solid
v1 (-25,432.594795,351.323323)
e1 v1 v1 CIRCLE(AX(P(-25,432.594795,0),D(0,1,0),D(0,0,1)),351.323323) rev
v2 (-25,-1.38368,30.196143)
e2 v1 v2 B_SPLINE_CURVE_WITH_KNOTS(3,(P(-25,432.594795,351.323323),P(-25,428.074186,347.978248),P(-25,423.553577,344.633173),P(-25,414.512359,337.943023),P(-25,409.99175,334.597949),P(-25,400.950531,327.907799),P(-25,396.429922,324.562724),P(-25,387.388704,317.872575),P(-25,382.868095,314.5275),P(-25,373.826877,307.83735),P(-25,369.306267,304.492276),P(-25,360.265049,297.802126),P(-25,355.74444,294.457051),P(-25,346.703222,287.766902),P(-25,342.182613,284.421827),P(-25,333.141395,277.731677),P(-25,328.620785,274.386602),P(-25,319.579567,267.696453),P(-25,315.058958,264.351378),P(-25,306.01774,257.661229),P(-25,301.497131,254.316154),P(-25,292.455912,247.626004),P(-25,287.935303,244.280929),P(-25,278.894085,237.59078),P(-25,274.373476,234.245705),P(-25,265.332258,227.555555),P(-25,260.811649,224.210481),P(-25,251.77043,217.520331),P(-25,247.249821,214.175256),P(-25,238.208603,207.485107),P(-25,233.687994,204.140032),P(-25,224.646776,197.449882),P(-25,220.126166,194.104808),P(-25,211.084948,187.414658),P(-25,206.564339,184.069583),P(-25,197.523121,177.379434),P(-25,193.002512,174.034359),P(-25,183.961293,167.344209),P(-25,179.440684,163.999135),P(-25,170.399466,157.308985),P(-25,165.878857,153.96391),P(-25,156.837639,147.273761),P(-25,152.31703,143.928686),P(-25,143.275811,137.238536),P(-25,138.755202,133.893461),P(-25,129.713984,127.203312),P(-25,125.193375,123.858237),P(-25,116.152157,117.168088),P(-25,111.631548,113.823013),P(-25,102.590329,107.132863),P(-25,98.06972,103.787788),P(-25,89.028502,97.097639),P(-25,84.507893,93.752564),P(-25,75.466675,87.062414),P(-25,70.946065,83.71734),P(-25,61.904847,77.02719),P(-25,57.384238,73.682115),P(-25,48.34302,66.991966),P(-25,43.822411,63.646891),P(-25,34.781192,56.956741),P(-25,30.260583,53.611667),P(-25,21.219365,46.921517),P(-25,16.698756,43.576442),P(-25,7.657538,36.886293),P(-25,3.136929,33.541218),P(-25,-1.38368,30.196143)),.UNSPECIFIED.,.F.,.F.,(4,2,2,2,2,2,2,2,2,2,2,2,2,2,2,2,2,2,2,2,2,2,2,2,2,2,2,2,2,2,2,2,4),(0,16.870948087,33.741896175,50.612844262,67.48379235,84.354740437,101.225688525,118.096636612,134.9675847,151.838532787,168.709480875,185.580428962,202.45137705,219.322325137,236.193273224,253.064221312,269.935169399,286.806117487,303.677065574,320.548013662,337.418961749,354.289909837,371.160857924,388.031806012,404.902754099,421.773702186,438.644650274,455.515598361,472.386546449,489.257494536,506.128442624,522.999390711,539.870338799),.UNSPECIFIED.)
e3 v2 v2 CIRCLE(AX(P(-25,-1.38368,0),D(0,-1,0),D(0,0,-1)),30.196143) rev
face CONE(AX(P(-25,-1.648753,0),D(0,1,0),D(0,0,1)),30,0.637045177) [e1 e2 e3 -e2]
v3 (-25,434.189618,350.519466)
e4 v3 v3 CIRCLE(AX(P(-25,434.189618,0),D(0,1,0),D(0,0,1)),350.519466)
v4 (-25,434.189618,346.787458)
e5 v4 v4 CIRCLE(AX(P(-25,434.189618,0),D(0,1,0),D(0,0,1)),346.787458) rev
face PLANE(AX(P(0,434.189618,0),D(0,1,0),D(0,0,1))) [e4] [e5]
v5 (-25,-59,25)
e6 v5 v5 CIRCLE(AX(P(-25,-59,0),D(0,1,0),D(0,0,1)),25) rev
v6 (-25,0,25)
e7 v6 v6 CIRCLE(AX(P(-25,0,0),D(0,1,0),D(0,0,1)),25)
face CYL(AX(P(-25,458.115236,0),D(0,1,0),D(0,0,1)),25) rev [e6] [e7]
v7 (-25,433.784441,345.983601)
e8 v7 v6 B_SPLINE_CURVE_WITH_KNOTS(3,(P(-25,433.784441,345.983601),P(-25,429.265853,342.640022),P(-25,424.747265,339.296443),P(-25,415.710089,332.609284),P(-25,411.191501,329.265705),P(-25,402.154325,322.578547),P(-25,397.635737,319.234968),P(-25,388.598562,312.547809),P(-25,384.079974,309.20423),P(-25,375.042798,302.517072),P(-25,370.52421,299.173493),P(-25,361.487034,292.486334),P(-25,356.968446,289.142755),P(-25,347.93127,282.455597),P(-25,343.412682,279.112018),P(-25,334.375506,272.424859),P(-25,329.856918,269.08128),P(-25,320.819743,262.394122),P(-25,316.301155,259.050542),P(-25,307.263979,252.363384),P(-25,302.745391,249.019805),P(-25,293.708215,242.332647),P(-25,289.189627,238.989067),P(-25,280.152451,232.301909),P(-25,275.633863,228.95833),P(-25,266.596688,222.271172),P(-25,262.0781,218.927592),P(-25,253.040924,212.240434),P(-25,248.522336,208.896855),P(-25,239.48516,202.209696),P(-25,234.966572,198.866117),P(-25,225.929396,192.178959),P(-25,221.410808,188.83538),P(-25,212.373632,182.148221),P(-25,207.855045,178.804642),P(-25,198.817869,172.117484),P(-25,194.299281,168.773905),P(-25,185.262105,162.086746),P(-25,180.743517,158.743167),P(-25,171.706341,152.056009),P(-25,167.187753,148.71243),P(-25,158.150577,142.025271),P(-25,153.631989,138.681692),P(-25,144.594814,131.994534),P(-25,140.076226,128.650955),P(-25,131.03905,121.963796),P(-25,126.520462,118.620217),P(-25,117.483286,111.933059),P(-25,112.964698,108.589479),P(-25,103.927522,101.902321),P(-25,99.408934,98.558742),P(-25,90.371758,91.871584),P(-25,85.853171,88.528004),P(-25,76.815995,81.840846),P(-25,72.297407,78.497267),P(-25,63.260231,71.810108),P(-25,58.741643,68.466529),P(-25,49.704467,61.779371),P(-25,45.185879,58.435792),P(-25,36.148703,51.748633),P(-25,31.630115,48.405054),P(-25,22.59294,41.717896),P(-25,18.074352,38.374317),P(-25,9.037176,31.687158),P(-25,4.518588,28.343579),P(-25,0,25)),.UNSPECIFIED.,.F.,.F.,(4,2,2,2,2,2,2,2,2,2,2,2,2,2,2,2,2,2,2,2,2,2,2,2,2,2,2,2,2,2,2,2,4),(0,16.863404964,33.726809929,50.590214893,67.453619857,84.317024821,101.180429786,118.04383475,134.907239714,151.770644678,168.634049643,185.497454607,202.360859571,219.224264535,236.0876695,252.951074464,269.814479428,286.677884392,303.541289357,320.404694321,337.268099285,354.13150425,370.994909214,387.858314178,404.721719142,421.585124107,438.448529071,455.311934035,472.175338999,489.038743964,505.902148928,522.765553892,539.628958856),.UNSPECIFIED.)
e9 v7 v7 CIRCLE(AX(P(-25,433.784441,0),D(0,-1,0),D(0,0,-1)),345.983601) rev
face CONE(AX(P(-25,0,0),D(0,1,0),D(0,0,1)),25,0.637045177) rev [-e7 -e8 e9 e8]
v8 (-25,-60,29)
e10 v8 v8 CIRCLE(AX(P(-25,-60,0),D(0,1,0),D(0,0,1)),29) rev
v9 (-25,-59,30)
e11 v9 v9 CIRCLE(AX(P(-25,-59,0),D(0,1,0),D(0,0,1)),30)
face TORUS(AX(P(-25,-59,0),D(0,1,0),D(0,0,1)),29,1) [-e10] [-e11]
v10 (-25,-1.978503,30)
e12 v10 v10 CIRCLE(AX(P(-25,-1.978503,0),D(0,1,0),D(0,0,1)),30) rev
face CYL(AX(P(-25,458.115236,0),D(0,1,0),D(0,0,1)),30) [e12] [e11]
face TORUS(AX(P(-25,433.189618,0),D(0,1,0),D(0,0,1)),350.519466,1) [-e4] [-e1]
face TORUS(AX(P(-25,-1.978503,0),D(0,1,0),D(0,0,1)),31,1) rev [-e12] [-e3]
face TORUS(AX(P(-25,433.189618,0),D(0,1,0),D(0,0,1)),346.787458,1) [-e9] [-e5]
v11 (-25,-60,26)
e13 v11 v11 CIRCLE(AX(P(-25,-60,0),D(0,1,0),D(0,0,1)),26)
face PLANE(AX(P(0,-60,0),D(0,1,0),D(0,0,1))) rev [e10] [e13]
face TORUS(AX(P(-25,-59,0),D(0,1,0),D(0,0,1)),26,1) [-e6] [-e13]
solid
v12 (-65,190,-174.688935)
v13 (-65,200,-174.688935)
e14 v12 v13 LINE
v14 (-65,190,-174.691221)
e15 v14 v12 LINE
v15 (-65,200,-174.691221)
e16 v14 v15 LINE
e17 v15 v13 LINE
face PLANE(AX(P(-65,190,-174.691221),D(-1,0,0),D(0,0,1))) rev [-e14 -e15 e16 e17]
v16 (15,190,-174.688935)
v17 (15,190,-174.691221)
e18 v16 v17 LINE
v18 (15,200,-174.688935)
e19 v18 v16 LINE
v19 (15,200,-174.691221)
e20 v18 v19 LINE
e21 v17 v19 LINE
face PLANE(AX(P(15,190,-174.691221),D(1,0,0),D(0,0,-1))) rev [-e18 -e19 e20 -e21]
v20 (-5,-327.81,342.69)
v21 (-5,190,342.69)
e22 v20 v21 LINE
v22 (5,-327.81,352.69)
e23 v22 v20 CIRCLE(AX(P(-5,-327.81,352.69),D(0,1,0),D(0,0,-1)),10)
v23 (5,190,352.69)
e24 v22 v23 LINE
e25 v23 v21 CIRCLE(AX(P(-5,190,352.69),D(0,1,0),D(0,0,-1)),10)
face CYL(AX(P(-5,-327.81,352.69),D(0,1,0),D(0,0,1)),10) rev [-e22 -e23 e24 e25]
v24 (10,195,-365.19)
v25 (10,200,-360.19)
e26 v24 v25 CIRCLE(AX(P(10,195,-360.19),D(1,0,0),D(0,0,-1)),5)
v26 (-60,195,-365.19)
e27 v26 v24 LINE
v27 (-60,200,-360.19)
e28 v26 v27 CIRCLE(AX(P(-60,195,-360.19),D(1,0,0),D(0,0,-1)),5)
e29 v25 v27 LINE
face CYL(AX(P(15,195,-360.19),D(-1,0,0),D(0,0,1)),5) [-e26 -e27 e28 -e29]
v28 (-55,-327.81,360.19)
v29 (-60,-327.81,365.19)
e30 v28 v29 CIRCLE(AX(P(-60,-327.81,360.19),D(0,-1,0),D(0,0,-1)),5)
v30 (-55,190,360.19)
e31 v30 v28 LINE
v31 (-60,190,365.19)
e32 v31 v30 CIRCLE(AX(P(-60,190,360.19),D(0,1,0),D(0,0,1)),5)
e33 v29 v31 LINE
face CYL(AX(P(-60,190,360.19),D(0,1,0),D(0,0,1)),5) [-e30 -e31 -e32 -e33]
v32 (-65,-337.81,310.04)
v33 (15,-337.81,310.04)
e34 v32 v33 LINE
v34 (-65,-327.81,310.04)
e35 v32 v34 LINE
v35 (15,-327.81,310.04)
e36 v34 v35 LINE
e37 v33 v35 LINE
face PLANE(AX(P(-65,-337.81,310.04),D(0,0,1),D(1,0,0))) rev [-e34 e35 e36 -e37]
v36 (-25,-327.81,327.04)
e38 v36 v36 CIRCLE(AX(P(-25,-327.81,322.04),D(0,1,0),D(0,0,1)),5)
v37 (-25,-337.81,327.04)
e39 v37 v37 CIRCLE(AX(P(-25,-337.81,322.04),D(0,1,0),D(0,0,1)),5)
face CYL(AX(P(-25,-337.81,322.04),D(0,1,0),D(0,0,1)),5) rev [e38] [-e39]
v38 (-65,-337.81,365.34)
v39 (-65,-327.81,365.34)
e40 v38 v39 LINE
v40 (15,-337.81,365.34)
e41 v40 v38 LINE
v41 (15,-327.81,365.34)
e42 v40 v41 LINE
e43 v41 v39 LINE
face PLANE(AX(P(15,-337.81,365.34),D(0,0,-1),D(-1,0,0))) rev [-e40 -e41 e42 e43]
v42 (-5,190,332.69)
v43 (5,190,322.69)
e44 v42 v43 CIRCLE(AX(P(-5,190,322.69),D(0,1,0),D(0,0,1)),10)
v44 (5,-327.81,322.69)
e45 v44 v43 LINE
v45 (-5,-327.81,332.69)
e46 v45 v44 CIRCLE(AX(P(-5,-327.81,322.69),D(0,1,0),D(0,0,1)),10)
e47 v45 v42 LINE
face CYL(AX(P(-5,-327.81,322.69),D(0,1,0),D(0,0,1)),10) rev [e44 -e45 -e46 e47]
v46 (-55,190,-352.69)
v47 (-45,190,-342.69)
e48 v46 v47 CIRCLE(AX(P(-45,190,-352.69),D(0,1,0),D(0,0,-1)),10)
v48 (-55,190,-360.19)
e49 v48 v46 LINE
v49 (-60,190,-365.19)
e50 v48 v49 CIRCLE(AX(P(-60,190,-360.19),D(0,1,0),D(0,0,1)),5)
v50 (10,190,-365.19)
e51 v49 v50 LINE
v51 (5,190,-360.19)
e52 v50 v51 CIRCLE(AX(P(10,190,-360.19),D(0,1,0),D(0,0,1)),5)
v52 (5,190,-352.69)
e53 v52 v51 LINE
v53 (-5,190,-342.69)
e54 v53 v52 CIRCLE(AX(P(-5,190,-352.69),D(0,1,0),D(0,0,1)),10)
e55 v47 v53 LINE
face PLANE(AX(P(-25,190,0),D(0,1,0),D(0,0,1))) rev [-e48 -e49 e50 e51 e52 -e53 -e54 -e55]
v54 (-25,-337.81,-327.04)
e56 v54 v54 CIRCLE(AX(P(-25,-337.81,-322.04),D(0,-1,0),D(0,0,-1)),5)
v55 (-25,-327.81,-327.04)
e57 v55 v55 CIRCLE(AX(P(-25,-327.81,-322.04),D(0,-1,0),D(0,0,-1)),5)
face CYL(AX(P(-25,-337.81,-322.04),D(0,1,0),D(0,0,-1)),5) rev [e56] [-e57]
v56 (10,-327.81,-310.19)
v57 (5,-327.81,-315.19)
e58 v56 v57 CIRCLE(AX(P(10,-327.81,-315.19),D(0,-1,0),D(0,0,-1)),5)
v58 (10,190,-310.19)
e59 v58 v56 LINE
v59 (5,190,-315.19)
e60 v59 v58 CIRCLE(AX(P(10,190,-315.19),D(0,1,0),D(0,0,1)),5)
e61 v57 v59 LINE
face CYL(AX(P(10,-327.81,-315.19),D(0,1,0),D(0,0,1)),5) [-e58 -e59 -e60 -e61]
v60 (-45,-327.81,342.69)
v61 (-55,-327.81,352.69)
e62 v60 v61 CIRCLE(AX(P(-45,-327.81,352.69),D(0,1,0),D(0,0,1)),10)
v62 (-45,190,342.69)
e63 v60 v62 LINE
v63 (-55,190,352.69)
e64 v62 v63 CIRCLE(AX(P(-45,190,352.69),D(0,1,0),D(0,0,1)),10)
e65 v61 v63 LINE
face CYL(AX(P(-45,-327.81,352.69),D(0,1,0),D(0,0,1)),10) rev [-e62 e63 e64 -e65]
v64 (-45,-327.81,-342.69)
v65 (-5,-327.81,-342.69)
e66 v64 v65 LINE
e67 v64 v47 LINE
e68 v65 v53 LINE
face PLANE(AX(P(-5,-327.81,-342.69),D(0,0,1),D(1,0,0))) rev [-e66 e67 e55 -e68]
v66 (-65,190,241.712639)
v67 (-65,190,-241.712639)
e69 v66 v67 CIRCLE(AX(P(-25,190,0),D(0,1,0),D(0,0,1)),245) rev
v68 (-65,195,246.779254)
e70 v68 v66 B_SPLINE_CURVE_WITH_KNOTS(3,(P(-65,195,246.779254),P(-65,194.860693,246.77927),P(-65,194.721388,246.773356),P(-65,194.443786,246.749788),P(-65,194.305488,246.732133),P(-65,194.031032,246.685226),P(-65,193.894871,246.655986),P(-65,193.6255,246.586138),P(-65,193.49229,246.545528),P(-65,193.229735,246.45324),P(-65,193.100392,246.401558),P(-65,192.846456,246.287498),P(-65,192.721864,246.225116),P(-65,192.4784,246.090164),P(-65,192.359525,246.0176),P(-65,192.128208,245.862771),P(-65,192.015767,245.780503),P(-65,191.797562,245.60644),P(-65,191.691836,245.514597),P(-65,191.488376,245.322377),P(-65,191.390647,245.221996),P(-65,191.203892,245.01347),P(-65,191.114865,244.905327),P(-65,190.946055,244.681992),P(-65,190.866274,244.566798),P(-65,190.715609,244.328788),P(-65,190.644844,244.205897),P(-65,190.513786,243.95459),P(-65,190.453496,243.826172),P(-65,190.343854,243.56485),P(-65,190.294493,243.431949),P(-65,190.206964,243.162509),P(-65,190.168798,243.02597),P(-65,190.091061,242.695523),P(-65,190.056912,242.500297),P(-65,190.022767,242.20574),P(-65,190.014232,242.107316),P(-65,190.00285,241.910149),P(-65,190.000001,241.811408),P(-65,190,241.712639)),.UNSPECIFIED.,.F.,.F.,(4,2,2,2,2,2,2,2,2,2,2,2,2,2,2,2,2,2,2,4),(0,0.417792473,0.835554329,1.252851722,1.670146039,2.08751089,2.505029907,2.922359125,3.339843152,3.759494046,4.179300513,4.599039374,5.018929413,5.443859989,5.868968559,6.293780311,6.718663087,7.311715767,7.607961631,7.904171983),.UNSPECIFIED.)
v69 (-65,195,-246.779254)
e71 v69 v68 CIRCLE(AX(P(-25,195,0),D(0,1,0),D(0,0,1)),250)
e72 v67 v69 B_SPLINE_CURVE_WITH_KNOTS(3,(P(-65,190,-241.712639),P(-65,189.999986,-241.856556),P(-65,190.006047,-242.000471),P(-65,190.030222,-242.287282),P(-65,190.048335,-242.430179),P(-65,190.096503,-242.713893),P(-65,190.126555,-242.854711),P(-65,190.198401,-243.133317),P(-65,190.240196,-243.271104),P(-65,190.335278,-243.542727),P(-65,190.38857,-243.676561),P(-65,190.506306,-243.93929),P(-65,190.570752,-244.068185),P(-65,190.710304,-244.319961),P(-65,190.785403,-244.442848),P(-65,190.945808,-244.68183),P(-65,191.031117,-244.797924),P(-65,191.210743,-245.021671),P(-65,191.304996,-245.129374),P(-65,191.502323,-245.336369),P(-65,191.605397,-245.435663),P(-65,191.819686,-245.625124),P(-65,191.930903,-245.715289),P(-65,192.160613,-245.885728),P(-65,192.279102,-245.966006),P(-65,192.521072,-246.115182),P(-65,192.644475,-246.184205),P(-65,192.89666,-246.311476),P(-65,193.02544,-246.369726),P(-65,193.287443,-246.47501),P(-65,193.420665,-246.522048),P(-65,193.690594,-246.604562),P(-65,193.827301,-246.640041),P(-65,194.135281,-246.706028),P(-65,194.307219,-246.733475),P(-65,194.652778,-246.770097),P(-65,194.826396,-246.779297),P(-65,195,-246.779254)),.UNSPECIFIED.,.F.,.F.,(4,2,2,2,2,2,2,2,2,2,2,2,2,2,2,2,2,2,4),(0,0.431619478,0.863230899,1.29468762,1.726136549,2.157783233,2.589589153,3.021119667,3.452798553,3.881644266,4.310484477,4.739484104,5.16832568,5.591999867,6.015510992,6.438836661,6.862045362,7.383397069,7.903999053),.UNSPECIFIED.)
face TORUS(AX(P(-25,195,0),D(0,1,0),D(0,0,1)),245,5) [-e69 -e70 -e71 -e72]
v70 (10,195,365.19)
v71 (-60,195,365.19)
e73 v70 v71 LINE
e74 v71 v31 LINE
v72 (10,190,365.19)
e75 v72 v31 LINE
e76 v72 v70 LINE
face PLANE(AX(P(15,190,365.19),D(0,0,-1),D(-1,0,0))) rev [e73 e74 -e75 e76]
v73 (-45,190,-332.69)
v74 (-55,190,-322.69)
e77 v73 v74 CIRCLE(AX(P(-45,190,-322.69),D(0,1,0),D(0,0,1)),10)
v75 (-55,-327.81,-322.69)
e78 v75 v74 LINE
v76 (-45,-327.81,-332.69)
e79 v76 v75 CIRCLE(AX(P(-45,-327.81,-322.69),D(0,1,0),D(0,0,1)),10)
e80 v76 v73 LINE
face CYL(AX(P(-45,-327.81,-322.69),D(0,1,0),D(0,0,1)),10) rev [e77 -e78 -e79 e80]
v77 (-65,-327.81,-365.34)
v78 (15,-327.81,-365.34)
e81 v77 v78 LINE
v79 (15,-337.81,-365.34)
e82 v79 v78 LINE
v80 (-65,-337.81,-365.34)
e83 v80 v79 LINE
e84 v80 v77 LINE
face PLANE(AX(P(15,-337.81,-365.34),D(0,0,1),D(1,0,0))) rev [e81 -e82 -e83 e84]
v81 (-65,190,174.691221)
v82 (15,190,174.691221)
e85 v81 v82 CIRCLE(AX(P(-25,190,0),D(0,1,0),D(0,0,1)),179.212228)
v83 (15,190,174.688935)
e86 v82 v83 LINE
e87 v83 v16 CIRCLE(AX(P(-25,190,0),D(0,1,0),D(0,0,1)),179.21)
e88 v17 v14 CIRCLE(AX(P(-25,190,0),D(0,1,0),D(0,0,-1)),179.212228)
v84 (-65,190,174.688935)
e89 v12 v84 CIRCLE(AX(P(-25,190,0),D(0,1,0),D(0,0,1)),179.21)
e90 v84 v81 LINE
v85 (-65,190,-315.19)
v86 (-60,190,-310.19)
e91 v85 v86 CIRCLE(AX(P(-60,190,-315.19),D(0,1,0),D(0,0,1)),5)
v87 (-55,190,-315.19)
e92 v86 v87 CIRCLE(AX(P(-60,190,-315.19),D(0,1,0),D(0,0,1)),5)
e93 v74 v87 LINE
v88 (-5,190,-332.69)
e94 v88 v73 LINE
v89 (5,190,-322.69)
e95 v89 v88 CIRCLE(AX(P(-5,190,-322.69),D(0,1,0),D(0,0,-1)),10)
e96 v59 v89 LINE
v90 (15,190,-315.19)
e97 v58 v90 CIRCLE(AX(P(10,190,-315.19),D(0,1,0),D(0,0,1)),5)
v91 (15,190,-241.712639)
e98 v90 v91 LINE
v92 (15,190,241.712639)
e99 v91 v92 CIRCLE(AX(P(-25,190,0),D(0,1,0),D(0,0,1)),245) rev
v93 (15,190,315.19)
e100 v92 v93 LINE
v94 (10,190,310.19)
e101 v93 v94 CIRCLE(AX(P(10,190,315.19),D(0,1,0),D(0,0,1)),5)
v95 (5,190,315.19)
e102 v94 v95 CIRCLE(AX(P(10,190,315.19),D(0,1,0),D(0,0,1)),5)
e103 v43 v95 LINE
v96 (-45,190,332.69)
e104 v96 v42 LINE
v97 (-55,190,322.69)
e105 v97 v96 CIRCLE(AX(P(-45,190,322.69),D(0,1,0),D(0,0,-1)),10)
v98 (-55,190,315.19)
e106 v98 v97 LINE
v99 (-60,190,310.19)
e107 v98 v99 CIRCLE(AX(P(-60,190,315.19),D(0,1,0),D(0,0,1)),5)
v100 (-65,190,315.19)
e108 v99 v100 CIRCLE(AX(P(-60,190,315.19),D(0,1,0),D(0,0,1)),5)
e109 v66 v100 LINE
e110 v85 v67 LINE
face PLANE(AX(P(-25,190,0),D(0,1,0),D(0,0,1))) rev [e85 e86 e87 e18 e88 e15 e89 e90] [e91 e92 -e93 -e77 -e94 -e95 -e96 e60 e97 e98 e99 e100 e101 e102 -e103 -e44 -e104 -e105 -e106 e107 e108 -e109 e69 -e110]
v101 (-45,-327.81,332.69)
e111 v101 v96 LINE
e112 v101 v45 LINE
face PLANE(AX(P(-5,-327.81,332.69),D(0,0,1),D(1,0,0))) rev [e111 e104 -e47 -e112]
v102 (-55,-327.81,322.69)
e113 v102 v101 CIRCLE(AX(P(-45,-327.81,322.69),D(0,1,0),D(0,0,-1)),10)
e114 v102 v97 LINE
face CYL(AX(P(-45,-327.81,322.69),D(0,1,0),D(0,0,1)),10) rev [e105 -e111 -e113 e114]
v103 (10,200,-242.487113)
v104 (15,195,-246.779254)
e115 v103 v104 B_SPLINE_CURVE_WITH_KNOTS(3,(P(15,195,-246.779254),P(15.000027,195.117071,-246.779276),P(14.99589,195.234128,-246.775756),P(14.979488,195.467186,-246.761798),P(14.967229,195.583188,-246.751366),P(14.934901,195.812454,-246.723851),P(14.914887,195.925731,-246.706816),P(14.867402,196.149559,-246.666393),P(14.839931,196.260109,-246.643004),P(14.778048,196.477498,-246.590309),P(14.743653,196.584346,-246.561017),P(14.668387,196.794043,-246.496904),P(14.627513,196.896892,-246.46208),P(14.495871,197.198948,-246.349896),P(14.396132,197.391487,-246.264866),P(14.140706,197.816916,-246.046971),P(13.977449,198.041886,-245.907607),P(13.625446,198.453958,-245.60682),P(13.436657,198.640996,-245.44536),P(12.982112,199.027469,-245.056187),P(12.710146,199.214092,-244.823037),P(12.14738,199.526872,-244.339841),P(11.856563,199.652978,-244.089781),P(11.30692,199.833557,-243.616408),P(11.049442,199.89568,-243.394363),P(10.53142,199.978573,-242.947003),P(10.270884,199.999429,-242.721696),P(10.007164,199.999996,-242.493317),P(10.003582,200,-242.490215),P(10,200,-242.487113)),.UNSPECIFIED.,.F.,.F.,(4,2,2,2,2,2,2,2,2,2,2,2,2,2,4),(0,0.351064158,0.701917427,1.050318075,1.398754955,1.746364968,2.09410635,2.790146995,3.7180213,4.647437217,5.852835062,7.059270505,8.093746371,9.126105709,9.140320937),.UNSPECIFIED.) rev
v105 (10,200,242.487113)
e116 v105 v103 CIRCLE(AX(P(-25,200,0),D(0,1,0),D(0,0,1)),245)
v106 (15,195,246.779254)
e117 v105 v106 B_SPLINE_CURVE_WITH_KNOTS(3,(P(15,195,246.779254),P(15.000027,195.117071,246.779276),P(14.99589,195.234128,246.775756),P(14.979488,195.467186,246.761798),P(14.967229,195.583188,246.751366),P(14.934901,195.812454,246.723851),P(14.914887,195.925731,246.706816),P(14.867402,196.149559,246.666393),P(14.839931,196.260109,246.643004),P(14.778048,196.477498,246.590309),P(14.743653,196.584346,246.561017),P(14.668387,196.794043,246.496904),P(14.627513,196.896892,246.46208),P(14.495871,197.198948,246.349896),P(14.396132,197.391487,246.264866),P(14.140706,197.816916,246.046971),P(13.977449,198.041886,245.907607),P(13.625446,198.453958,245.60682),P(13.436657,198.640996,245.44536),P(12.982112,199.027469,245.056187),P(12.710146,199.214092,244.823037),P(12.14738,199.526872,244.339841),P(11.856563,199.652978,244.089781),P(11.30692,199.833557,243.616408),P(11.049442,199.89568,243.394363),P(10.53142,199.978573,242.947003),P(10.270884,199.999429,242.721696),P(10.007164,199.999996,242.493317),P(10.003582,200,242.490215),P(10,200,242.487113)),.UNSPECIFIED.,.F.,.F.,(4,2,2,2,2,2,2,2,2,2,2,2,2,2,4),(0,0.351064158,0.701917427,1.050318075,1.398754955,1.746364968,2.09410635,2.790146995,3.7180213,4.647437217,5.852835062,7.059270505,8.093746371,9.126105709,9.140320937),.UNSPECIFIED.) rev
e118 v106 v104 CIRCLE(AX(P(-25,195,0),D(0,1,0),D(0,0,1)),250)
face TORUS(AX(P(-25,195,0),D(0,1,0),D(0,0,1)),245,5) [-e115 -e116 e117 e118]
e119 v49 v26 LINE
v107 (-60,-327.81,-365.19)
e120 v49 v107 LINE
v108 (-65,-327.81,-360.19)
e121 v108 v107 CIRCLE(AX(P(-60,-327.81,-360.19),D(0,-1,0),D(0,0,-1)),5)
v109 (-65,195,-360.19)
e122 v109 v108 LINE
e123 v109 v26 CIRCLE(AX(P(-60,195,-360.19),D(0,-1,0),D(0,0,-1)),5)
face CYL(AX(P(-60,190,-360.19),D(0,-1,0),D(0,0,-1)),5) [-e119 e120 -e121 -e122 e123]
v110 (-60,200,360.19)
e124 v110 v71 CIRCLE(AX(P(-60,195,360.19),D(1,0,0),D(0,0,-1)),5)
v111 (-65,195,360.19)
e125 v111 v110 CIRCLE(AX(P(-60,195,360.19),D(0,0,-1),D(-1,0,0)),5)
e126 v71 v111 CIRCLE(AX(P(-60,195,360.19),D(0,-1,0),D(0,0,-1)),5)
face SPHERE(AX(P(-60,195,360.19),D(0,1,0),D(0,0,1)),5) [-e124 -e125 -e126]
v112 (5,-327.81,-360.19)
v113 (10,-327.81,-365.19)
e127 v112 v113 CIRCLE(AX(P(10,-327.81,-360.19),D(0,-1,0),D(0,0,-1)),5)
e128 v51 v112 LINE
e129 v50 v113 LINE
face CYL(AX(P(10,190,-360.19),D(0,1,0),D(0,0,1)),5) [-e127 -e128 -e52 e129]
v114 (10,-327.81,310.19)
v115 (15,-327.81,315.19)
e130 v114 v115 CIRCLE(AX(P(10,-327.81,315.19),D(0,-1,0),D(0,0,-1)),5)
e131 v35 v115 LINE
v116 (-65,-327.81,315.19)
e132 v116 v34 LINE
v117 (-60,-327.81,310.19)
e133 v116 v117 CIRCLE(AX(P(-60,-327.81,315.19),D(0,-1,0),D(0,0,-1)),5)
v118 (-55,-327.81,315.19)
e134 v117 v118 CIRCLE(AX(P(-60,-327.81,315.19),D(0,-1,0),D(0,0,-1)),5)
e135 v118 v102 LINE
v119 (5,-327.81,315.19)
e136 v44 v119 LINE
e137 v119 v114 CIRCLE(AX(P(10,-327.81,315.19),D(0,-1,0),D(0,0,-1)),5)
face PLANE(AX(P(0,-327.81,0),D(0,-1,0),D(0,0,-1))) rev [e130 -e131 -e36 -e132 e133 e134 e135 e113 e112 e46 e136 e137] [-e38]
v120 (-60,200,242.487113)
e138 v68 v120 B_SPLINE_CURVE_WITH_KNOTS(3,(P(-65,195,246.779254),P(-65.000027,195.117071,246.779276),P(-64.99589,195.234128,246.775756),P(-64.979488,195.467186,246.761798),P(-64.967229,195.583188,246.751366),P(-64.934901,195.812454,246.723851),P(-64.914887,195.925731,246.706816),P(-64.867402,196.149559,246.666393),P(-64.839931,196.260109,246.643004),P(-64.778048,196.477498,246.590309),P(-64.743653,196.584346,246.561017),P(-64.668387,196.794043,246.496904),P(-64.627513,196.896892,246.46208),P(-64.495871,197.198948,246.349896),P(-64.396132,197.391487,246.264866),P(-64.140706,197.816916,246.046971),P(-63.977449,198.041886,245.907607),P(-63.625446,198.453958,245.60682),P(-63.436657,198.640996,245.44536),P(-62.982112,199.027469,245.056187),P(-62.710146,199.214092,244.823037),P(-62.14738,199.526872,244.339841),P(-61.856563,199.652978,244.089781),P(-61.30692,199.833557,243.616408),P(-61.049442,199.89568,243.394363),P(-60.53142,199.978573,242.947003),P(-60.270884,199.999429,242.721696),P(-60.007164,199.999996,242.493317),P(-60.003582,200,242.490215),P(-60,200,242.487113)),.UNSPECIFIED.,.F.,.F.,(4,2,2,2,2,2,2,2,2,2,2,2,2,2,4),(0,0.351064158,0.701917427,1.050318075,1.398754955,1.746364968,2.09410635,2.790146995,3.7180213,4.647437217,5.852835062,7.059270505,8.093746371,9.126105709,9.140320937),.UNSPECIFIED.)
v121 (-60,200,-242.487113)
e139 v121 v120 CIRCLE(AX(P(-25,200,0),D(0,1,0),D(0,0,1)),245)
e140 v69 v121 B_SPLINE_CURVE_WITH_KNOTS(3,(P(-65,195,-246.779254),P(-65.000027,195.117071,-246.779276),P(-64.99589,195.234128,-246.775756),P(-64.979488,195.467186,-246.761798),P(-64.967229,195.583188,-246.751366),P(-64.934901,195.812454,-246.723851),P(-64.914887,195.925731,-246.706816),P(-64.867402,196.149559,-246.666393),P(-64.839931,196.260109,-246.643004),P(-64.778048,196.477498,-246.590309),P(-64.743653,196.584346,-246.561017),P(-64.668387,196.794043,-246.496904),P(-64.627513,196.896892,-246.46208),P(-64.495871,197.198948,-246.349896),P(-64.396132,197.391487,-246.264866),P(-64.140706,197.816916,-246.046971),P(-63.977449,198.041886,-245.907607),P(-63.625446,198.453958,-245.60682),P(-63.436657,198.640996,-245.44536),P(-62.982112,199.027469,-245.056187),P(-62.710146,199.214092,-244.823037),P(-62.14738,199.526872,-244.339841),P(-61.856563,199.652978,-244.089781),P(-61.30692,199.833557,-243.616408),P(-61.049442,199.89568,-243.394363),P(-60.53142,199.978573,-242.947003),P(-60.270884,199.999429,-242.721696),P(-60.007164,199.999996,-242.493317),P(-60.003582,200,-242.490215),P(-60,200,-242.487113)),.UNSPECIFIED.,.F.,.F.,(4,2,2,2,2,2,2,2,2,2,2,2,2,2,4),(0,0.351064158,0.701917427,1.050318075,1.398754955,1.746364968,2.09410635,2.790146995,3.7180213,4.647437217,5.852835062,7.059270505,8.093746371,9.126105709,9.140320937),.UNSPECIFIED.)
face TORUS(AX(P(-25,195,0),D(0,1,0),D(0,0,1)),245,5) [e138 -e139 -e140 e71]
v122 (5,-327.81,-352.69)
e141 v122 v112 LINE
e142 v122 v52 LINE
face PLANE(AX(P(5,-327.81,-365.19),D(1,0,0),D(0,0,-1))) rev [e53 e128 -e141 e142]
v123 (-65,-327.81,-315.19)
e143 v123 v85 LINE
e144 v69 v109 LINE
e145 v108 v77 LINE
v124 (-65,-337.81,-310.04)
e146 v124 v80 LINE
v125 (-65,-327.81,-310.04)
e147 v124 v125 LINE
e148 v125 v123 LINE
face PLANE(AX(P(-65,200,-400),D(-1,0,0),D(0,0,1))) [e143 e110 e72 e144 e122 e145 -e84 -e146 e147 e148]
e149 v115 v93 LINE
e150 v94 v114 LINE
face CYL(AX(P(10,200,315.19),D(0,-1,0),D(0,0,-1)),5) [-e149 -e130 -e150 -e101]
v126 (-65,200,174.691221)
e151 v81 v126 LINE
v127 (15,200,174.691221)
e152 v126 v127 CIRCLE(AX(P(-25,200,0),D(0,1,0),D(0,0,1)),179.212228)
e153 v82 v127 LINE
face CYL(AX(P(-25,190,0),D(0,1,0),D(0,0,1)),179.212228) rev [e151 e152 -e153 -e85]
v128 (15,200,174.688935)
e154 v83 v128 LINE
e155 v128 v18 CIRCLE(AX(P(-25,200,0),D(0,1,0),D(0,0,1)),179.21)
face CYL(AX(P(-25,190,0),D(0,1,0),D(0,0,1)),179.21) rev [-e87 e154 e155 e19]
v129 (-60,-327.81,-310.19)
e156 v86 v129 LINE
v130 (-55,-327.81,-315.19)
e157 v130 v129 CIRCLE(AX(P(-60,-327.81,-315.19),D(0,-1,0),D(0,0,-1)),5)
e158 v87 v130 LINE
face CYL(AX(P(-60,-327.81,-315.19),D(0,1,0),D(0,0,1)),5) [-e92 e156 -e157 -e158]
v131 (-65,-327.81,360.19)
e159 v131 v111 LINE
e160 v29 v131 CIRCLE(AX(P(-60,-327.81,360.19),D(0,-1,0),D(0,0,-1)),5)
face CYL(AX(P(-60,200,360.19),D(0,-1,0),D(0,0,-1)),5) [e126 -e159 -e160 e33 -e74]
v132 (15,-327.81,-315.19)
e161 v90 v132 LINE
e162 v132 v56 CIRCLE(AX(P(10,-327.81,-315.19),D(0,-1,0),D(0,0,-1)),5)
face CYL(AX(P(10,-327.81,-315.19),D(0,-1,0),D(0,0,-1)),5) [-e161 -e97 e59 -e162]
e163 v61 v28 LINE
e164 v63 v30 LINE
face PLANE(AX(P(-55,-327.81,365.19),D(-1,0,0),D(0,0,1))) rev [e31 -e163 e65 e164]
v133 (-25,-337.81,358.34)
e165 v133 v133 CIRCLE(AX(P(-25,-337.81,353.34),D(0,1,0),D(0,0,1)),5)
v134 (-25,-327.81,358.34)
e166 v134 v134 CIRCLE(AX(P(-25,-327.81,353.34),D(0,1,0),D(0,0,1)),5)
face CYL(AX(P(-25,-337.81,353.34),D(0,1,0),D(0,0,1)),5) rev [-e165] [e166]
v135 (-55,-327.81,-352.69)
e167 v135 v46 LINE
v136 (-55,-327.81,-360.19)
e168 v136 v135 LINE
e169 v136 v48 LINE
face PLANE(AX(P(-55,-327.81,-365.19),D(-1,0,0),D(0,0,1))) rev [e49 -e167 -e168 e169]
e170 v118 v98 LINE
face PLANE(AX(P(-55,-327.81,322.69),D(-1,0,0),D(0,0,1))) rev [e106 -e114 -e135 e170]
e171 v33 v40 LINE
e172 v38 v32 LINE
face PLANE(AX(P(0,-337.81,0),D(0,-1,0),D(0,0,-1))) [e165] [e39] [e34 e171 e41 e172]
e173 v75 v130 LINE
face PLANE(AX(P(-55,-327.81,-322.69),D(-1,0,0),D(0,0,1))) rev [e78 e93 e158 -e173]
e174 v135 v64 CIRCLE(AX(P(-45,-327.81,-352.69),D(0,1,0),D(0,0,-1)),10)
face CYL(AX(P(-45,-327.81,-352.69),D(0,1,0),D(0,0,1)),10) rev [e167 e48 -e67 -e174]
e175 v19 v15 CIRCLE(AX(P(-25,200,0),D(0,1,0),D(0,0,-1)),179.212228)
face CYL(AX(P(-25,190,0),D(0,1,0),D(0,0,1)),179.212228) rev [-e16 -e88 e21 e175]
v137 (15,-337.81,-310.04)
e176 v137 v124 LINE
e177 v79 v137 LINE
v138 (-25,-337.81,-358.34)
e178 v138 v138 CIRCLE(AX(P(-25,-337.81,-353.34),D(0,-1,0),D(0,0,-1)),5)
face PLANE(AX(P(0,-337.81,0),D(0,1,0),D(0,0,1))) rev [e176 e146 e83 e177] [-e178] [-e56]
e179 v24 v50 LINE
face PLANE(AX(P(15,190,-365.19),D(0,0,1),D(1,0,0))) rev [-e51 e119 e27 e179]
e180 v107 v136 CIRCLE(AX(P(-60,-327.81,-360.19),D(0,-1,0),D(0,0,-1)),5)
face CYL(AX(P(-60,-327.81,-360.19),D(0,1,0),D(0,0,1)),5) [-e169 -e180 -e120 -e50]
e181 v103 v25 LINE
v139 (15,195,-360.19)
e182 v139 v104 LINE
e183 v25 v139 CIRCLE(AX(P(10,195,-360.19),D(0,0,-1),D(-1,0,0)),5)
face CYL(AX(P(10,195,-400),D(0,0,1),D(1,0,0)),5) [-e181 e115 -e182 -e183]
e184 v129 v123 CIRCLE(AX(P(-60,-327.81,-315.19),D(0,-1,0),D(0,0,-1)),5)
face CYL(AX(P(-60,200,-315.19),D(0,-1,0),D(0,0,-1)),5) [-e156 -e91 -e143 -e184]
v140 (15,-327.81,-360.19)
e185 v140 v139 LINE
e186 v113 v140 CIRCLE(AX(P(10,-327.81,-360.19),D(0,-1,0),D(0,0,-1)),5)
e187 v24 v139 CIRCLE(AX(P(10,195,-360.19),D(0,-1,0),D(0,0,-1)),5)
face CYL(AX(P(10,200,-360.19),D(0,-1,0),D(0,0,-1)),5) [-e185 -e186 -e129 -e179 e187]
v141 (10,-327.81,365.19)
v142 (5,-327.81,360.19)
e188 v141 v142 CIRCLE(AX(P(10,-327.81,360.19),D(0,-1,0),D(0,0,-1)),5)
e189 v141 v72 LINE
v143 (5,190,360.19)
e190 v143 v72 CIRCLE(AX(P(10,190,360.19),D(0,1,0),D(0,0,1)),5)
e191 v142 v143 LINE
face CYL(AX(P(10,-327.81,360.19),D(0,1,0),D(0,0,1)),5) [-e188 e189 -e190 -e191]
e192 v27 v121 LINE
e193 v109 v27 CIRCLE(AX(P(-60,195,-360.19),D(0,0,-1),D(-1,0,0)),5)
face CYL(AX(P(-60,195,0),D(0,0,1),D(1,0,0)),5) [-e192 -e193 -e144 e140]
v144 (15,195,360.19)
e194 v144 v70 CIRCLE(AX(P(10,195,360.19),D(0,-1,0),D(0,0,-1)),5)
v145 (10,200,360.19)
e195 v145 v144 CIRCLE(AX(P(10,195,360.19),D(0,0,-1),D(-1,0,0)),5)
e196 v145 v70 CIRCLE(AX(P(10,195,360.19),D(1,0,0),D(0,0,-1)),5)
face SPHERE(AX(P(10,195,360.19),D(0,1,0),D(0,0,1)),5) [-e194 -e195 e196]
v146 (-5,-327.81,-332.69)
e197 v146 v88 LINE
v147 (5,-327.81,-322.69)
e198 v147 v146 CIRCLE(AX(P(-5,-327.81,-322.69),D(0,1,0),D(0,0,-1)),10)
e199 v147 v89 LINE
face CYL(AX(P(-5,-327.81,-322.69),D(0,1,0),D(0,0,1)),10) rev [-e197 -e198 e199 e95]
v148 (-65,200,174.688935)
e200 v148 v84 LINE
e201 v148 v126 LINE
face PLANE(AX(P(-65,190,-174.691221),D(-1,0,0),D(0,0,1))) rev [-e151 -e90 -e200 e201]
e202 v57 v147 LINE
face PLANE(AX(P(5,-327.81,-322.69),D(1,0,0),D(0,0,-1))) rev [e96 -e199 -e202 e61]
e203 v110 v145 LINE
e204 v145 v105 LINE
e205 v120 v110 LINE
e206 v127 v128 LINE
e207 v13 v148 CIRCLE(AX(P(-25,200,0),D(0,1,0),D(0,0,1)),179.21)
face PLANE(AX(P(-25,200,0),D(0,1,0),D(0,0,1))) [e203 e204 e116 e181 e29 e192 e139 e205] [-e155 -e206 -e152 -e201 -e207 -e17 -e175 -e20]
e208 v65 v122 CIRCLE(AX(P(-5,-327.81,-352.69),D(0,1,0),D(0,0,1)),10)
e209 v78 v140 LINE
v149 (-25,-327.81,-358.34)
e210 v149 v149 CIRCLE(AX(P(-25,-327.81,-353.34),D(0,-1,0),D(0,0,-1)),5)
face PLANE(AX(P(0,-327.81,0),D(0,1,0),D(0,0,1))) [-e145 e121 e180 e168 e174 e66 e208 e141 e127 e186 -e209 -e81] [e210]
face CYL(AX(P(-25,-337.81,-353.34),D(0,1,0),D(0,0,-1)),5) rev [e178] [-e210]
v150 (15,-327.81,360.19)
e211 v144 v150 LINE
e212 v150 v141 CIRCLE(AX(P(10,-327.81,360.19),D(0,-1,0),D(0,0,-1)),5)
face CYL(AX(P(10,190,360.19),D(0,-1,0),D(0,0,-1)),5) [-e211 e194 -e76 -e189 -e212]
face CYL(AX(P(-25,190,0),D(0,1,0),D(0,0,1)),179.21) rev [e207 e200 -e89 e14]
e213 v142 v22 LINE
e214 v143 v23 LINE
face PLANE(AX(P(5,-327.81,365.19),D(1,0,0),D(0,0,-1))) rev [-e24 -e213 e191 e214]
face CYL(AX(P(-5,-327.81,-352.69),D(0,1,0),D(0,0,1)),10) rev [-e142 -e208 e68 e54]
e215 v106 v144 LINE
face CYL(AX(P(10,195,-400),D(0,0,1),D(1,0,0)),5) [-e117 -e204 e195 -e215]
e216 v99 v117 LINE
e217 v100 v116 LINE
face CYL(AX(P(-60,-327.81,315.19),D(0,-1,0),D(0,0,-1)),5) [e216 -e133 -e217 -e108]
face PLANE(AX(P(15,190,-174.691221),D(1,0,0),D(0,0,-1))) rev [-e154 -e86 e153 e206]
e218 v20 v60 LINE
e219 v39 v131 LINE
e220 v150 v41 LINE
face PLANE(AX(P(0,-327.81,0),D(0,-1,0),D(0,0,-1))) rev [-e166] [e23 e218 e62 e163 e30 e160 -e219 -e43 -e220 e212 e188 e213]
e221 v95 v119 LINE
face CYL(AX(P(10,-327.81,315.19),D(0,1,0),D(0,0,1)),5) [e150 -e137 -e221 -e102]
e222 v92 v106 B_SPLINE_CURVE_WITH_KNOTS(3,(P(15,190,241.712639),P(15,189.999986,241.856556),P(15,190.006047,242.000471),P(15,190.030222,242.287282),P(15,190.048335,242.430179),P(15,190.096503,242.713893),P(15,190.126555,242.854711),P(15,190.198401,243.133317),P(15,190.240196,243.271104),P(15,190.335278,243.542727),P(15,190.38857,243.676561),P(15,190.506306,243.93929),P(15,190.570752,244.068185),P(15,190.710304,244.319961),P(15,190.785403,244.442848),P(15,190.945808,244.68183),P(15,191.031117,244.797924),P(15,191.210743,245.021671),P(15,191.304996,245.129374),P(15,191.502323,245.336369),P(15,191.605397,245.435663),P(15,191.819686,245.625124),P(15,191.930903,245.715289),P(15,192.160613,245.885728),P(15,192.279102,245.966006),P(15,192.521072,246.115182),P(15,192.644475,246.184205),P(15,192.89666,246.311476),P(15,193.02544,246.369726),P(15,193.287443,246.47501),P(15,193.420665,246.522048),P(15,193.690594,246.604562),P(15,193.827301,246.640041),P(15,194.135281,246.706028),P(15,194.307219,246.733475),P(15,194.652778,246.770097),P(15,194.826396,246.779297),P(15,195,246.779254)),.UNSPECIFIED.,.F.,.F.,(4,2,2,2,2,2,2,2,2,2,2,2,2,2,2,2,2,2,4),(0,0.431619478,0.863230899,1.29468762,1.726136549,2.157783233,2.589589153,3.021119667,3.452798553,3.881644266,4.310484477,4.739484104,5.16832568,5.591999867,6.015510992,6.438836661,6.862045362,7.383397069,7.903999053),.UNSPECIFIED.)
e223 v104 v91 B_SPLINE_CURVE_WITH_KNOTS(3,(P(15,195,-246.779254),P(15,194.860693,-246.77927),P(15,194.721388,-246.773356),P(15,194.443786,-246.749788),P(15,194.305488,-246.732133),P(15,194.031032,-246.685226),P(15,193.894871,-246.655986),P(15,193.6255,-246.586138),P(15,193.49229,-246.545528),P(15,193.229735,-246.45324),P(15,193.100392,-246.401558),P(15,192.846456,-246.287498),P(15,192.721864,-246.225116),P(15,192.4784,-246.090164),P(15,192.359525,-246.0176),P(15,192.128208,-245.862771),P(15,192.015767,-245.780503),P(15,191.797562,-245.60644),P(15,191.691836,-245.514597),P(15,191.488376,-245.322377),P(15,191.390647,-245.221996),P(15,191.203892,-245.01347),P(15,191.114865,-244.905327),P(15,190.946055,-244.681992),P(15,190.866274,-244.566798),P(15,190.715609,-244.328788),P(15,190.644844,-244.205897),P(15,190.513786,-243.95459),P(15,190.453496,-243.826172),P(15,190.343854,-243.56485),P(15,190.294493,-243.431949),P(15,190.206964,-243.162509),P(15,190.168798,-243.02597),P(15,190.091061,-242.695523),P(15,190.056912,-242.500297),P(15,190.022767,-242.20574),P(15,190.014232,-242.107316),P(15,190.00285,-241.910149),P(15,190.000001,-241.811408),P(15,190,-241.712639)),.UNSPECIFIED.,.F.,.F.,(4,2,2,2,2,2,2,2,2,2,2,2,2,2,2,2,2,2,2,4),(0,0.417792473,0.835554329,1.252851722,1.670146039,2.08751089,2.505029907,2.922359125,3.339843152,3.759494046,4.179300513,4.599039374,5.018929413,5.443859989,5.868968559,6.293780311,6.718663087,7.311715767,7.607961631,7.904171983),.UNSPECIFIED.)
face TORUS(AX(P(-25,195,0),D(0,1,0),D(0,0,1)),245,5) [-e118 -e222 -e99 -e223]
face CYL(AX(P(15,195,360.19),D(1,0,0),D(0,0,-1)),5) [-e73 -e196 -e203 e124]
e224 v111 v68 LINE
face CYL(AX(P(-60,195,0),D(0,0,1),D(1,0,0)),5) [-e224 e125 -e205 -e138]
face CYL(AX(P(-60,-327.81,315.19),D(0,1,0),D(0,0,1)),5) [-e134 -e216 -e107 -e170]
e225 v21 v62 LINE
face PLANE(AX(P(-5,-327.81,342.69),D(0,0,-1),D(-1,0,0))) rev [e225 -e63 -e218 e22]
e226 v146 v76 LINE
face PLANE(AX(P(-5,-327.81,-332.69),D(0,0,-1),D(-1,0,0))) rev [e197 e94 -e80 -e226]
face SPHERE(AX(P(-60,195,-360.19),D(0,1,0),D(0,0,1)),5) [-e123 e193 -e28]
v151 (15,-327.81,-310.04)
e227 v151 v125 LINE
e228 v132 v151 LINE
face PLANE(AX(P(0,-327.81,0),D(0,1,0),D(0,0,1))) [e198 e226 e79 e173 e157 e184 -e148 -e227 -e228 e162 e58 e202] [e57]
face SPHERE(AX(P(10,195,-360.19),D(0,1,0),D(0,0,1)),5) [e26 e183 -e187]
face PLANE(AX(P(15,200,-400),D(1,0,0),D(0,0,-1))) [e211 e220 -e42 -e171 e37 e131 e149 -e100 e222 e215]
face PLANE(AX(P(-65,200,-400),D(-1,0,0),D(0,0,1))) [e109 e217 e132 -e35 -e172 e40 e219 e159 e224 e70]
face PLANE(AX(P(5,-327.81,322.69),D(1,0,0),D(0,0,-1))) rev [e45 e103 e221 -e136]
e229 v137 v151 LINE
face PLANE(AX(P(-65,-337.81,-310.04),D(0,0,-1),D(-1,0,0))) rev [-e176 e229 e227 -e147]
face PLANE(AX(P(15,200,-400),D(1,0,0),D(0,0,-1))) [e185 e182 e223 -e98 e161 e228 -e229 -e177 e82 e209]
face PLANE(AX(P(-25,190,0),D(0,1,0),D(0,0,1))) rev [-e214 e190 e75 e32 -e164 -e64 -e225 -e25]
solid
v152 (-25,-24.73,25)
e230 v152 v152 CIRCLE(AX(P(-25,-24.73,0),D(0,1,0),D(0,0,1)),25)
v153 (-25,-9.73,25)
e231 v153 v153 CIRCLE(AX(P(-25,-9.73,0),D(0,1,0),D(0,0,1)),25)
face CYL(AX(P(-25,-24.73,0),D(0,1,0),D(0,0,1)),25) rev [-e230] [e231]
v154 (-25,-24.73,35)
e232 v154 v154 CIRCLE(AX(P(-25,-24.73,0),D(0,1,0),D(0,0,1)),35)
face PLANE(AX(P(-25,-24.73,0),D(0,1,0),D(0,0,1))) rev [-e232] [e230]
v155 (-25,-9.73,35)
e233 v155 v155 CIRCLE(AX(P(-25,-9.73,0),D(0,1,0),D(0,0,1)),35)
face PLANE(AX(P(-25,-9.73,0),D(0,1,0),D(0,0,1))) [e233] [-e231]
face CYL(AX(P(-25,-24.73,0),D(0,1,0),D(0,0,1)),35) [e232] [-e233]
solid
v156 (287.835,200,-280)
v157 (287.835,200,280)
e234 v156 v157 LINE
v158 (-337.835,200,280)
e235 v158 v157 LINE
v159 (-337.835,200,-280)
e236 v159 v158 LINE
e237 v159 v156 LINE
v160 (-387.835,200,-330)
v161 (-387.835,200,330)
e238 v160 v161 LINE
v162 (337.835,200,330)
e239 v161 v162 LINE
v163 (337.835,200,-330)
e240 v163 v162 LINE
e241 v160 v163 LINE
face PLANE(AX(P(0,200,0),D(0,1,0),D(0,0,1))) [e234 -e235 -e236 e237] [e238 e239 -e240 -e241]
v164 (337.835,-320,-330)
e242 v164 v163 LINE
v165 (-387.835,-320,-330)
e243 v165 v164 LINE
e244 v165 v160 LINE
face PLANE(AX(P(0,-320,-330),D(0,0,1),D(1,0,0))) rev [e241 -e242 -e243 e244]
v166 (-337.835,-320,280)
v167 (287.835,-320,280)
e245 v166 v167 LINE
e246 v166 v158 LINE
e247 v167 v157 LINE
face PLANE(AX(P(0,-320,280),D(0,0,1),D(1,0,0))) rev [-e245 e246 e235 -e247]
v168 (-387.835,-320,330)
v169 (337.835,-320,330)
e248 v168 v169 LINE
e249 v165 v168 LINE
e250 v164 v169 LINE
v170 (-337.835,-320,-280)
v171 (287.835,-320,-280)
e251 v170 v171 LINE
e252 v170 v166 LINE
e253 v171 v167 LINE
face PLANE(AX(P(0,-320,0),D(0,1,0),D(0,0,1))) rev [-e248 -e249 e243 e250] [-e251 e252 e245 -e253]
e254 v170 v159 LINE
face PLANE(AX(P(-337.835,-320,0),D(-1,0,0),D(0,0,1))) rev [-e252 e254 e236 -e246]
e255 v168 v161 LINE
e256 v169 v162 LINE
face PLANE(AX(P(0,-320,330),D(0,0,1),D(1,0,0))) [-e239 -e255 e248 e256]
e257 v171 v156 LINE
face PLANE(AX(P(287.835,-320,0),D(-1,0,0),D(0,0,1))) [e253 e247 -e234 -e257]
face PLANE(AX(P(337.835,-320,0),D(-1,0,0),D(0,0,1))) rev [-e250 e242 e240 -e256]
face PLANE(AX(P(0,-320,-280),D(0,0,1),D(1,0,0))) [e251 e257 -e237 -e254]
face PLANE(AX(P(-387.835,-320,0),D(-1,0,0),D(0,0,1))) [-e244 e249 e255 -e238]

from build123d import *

# Parameters (mm, degrees)
FILLET1_R                 = 1
SKETCH8_R                 = 250
SKETCH8_R_2               = 179.21
BOSS_EXTRUDE2_DEPTH       = 10
SKETCH10_W                = 725.67
SKETCH10_H                = 660
SKETCH10_W_2              = 625.67
SKETCH10_H_2              = 560
BOSS_EXTRUDE3_DEPTH       = 520
BOSS_EXTRUDE10_DEPTH      = 400
BOSS_EXTRUDE10_DEPTH_BACK = 400
SKETCH22_W                = 80
SKETCH22_H                = 10
CUT_EXTRUDE10_DEPTH       = 10
SKETCH28_W                = 80
SKETCH28_H                = 34.81
CUT_EXTRUDE11_DEPTH       = 10
BOSS_EXTRUDE12_DEPTH      = 517.81
FILLET2_R                 = 5
FILLET3_R                 = 5
BOSS_EXTRUDE13_DEPTH      = 10
SKETCH31_R                = 5
CUT_EXTRUDE12_DEPTH       = 10
SKETCH33_R                = 35
SKETCH33_R_2              = 25
BOSS_EXTRUDE14_DEPTH      = 15
FILLET4_R                 = 5


with BuildPart() as part:
    # Sketch6 → Revolve2 (revolve)
    with BuildSketch(Plane.XY, mode=Mode.PRIVATE) as revolve2_sk:
        Polygon((321.283416485, 434.189617978), (327.503429332, 434.189617978), (5, -1.648752736), (5, -60), (0, -60), (0, 0), align=None)
    revolve(revolve2_sk.sketch.rotate(Axis((-25, 458.115236255, 0), (0, -1, 0)), 90), axis=Axis((-25, 458.115236255, 0), (0, -1, 0)))

    # Fillet1
    fillet1_edges = [part.edges().sort_by_distance(p)[0] for p in [
        (-25, 434.189617978, -352.503429332),
        (-25, -1.648752736, -30),
        (-25, -60, -30),
        (-25, -60, -25),
        (-25, 434.189617978, -346.283416485),
    ]]
    fillet(fillet1_edges, radius=FILLET1_R)


with BuildPart() as body_2:
    # Sketch8 → Boss-Extrude2 (new body)
    with BuildSketch(Plane(origin=(0, 200, 0), x_dir=(1, 0, 0), z_dir=(0, 1, 0))):
        with Locations(Location((-25, 0, 0), (0, 0, 270))):
            Circle(SKETCH8_R)
        with Locations(Location((-25, 0, 0), (0, 0, 270))):
            Circle(SKETCH8_R_2, mode=Mode.SUBTRACT)
    extrude(amount=-BOSS_EXTRUDE2_DEPTH)


with BuildPart() as body_3:
    # Sketch10 → Boss-Extrude3 (new body)
    with BuildSketch(Plane(origin=(0, 200, 0), x_dir=(1, 0, 0), z_dir=(0, 1, 0))):
        with Locations((-25, 0)):
            Rectangle(SKETCH10_W, SKETCH10_H)
        with Locations((-25, 0)):
            Rectangle(SKETCH10_W_2, SKETCH10_H_2, mode=Mode.SUBTRACT)
    extrude(amount=-BOSS_EXTRUDE3_DEPTH)


with BuildPart() as body_4:
    # Sketch22 → Boss-Extrude10 (new, two sides: drawn at the far end of the back side and taken through both)
    with BuildSketch(Plane.XY.offset(-BOSS_EXTRUDE10_DEPTH_BACK)):
        with Locations((-25, 195)):
            Rectangle(SKETCH22_W, SKETCH22_H)
    extrude(amount=BOSS_EXTRUDE10_DEPTH + BOSS_EXTRUDE10_DEPTH_BACK)


with BuildPart() as cut_extrude10_tool:
    # Sketch25 → Cut-Extrude10 (new body)
    with BuildSketch(Plane(origin=(0, 200, 0), x_dir=(1, 0, 0), z_dir=(0, 1, 0))):
        with BuildLine():
            Line((-65, 174.691220764), (-65, -174.691220764))
            ThreePointArc((-65, -174.691220764), (-25, -179.212227852), (15, -174.691220764))
            Line((15, -174.691220764), (15, 174.691220764))
            ThreePointArc((15, 174.691220764), (-25, 179.212227852), (-65, 174.691220764))
        make_face()
    extrude(amount=-CUT_EXTRUDE10_DEPTH)


with BuildPart() as body_2_1:
    add(body_2.part)

    # Cut-Extrude10: cut by cut_extrude10_tool
    add(cut_extrude10_tool.part, mode=Mode.SUBTRACT)


with BuildPart() as body_4_1:
    add(body_4.part)

    # Cut-Extrude10: cut by cut_extrude10_tool
    add(cut_extrude10_tool.part, mode=Mode.SUBTRACT)


with BuildPart() as body_2_2:
    add(body_2_1.part)

    # Combine3: read off the stored shape, not the designer's step
    # Combine3: union body 4
    add(body_4_1.part)

    # Sketch28 → Cut-Extrude11 (cut)
    with BuildSketch(Plane(origin=(0, 200, 0), x_dir=(1, 0, 0), z_dir=(0, 1, 0))):
        with Locations((-25, -382.595)):
            Rectangle(SKETCH28_W, SKETCH28_H)
        with Locations((-25, 382.595)):
            Rectangle(SKETCH28_W, SKETCH28_H)
    extrude(amount=-CUT_EXTRUDE11_DEPTH, mode=Mode.SUBTRACT)

    # Sketch29 → Boss-Extrude12 (add)
    with BuildSketch(Plane.XZ.offset(-190)):
        with BuildLine():
            Line((15, 365.19), (5, 365.19))
            Line((5, 365.19), (5, 352.69))
            ThreePointArc((5, 352.69), (2.071067812, 345.618932188), (-5, 342.69))
            Line((-5, 342.69), (-45, 342.69))
            ThreePointArc((-45, 342.69), (-52.071067812, 345.618932188), (-55, 352.69))
            Line((-55, 352.69), (-55, 365.19))
            Line((-55, 365.19), (-65, 365.19))
            Line((-65, 365.19), (-65, 310.19))
            Line((-65, 310.19), (-55, 310.19))
            Line((-55, 310.19), (-55, 322.69))
            ThreePointArc((-55, 322.69), (-52.071067812, 329.761067812), (-45, 332.69))
            Line((-45, 332.69), (-5, 332.69))
            ThreePointArc((-5, 332.69), (2.071067812, 329.761067812), (5, 322.69))
            Line((5, 322.69), (5, 310.19))
            Line((5, 310.19), (15, 310.19))
            Line((15, 310.19), (15, 365.19))
        make_face()
        with BuildLine():
            Line((-55, -365.19), (-65, -365.19))
            Line((-65, -365.19), (-65, -310.19))
            Line((-65, -310.19), (-55, -310.19))
            Line((-55, -310.19), (-55, -322.69))
            ThreePointArc((-55, -322.69), (-52.071067812, -329.761067812), (-45, -332.69))
            Line((-45, -332.69), (-5, -332.69))
            ThreePointArc((-5, -332.69), (2.071067812, -329.761067812), (5, -322.69))
            Line((5, -322.69), (5, -310.19))
            Line((5, -310.19), (15, -310.19))
            Line((15, -310.19), (15, -365.19))
            Line((15, -365.19), (5, -365.19))
            Line((5, -365.19), (5, -352.69))
            ThreePointArc((5, -352.69), (2.071067812, -345.618932188), (-5, -342.69))
            Line((-5, -342.69), (-45, -342.69))
            ThreePointArc((-45, -342.69), (-52.071067812, -345.618932188), (-55, -352.69))
            Line((-55, -352.69), (-55, -365.19))
        make_face()
    extrude(amount=BOSS_EXTRUDE12_DEPTH)

    # Fillet2
    fillet2_edges = [body_2_2.edges().sort_by_distance(p)[0] for p in [
        (-65, -68.905, 310.19),
        (-55, -68.905, 310.19),
        (5, -68.905, 310.19),
        (15, -68.905, 310.19),
        (15, -63.905, 365.19),
        (5, -68.905, 365.19),
        (-55, -68.905, 365.19),
        (-65, -63.905, 365.19),
    ]]
    fillet(fillet2_edges, radius=FILLET2_R - 0.0001)  # a hair under: the kernel refuses the full size

    # Fillet3
    fillet3_edges = [body_2_2.edges().sort_by_distance(p)[0] for p in [
        (15, -68.905, -310.19),
        (5, -68.905, -310.19),
        (-55, -68.905, -310.19),
        (-65, -68.905, -310.19),
        (-65, -63.905, -365.19),
        (-55, -68.905, -365.19),
        (5, -68.905, -365.19),
        (15, -63.905, -365.19),
    ]]
    fillet(fillet3_edges, radius=FILLET3_R - 0.0001)  # a hair under: the kernel refuses the full size

    # Sketch30 → Boss-Extrude13 (add)
    with BuildSketch(Plane.XZ.offset(327.81)):
        Polygon((15, 360.19), (15, 365.34), (-65, 365.34), (-65, 315.19), (-65, 310.04), (15, 310.04), (15, 315.19), align=None)
        Polygon((15, -360.19), (15, -365.34), (-65, -365.34), (-65, -315.19), (-65, -310.04), (15, -310.04), (15, -315.19), align=None)
    extrude(amount=BOSS_EXTRUDE13_DEPTH)

    # Sketch31 → Cut-Extrude12 (cut)
    with BuildSketch(Plane(origin=(0, -327.81, 0), x_dir=(1, 0, 0), z_dir=(0, 1, 0))):
        with Locations(Location((-25, -353.34, 0), (0, 0, 270))):
            Circle(SKETCH31_R)
        with Locations(Location((-25, -322.04, 0), (0, 0, 270))):
            Circle(SKETCH31_R)
    cut_extrude12 = extrude(amount=-CUT_EXTRUDE12_DEPTH, mode=Mode.SUBTRACT)

    # Mirror1: Cut-Extrude12 across plane
    add(cut_extrude12.mirror(Plane.XY), mode=Mode.SUBTRACT)

    # Fillet4
    fillet4_edges = [body_2_2.edges().sort_by_distance(p)[0] for p in [
        (13.535563195, 200, -363.725563195),
        (15, 200, -303.484676793),
        (225, 200, 0),
        (15, 200, 303.484676793),
        (13.535563195, 200, 363.725563195),
        (-25, 200, 365.19),
        (-63.535563195, 200, 363.725563195),
        (-65, 200, 303.484676793),
        (-275, 200, 0),
        (-65, 200, -303.484676793),
        (-63.535563195, 200, -363.725563195),
        (-25, 200, -365.19),
        (-275, 190, 0),
        (225, 190, 0),
    ]]
    fillet(fillet4_edges, radius=FILLET4_R - 0.0001)  # a hair under: the kernel refuses the full size


with BuildPart() as body_4_2:
    # Sketch33 → Boss-Extrude14 (new body)
    with BuildSketch(Plane(origin=(0, -9.73, 0), x_dir=(1, 0, 0), z_dir=(0, 1, 0))):
        with Locations(Location((-25, 0, 0), (0, 0, 270))):
            Circle(SKETCH33_R)
        with Locations(Location((-25, 0, 0), (0, 0, 270))):
            Circle(SKETCH33_R_2, mode=Mode.SUBTRACT)
    extrude(amount=-BOSS_EXTRUDE14_DEPTH)


solid = Compound([part.part, body_3.part, body_2_2.part, body_4_2.part])
